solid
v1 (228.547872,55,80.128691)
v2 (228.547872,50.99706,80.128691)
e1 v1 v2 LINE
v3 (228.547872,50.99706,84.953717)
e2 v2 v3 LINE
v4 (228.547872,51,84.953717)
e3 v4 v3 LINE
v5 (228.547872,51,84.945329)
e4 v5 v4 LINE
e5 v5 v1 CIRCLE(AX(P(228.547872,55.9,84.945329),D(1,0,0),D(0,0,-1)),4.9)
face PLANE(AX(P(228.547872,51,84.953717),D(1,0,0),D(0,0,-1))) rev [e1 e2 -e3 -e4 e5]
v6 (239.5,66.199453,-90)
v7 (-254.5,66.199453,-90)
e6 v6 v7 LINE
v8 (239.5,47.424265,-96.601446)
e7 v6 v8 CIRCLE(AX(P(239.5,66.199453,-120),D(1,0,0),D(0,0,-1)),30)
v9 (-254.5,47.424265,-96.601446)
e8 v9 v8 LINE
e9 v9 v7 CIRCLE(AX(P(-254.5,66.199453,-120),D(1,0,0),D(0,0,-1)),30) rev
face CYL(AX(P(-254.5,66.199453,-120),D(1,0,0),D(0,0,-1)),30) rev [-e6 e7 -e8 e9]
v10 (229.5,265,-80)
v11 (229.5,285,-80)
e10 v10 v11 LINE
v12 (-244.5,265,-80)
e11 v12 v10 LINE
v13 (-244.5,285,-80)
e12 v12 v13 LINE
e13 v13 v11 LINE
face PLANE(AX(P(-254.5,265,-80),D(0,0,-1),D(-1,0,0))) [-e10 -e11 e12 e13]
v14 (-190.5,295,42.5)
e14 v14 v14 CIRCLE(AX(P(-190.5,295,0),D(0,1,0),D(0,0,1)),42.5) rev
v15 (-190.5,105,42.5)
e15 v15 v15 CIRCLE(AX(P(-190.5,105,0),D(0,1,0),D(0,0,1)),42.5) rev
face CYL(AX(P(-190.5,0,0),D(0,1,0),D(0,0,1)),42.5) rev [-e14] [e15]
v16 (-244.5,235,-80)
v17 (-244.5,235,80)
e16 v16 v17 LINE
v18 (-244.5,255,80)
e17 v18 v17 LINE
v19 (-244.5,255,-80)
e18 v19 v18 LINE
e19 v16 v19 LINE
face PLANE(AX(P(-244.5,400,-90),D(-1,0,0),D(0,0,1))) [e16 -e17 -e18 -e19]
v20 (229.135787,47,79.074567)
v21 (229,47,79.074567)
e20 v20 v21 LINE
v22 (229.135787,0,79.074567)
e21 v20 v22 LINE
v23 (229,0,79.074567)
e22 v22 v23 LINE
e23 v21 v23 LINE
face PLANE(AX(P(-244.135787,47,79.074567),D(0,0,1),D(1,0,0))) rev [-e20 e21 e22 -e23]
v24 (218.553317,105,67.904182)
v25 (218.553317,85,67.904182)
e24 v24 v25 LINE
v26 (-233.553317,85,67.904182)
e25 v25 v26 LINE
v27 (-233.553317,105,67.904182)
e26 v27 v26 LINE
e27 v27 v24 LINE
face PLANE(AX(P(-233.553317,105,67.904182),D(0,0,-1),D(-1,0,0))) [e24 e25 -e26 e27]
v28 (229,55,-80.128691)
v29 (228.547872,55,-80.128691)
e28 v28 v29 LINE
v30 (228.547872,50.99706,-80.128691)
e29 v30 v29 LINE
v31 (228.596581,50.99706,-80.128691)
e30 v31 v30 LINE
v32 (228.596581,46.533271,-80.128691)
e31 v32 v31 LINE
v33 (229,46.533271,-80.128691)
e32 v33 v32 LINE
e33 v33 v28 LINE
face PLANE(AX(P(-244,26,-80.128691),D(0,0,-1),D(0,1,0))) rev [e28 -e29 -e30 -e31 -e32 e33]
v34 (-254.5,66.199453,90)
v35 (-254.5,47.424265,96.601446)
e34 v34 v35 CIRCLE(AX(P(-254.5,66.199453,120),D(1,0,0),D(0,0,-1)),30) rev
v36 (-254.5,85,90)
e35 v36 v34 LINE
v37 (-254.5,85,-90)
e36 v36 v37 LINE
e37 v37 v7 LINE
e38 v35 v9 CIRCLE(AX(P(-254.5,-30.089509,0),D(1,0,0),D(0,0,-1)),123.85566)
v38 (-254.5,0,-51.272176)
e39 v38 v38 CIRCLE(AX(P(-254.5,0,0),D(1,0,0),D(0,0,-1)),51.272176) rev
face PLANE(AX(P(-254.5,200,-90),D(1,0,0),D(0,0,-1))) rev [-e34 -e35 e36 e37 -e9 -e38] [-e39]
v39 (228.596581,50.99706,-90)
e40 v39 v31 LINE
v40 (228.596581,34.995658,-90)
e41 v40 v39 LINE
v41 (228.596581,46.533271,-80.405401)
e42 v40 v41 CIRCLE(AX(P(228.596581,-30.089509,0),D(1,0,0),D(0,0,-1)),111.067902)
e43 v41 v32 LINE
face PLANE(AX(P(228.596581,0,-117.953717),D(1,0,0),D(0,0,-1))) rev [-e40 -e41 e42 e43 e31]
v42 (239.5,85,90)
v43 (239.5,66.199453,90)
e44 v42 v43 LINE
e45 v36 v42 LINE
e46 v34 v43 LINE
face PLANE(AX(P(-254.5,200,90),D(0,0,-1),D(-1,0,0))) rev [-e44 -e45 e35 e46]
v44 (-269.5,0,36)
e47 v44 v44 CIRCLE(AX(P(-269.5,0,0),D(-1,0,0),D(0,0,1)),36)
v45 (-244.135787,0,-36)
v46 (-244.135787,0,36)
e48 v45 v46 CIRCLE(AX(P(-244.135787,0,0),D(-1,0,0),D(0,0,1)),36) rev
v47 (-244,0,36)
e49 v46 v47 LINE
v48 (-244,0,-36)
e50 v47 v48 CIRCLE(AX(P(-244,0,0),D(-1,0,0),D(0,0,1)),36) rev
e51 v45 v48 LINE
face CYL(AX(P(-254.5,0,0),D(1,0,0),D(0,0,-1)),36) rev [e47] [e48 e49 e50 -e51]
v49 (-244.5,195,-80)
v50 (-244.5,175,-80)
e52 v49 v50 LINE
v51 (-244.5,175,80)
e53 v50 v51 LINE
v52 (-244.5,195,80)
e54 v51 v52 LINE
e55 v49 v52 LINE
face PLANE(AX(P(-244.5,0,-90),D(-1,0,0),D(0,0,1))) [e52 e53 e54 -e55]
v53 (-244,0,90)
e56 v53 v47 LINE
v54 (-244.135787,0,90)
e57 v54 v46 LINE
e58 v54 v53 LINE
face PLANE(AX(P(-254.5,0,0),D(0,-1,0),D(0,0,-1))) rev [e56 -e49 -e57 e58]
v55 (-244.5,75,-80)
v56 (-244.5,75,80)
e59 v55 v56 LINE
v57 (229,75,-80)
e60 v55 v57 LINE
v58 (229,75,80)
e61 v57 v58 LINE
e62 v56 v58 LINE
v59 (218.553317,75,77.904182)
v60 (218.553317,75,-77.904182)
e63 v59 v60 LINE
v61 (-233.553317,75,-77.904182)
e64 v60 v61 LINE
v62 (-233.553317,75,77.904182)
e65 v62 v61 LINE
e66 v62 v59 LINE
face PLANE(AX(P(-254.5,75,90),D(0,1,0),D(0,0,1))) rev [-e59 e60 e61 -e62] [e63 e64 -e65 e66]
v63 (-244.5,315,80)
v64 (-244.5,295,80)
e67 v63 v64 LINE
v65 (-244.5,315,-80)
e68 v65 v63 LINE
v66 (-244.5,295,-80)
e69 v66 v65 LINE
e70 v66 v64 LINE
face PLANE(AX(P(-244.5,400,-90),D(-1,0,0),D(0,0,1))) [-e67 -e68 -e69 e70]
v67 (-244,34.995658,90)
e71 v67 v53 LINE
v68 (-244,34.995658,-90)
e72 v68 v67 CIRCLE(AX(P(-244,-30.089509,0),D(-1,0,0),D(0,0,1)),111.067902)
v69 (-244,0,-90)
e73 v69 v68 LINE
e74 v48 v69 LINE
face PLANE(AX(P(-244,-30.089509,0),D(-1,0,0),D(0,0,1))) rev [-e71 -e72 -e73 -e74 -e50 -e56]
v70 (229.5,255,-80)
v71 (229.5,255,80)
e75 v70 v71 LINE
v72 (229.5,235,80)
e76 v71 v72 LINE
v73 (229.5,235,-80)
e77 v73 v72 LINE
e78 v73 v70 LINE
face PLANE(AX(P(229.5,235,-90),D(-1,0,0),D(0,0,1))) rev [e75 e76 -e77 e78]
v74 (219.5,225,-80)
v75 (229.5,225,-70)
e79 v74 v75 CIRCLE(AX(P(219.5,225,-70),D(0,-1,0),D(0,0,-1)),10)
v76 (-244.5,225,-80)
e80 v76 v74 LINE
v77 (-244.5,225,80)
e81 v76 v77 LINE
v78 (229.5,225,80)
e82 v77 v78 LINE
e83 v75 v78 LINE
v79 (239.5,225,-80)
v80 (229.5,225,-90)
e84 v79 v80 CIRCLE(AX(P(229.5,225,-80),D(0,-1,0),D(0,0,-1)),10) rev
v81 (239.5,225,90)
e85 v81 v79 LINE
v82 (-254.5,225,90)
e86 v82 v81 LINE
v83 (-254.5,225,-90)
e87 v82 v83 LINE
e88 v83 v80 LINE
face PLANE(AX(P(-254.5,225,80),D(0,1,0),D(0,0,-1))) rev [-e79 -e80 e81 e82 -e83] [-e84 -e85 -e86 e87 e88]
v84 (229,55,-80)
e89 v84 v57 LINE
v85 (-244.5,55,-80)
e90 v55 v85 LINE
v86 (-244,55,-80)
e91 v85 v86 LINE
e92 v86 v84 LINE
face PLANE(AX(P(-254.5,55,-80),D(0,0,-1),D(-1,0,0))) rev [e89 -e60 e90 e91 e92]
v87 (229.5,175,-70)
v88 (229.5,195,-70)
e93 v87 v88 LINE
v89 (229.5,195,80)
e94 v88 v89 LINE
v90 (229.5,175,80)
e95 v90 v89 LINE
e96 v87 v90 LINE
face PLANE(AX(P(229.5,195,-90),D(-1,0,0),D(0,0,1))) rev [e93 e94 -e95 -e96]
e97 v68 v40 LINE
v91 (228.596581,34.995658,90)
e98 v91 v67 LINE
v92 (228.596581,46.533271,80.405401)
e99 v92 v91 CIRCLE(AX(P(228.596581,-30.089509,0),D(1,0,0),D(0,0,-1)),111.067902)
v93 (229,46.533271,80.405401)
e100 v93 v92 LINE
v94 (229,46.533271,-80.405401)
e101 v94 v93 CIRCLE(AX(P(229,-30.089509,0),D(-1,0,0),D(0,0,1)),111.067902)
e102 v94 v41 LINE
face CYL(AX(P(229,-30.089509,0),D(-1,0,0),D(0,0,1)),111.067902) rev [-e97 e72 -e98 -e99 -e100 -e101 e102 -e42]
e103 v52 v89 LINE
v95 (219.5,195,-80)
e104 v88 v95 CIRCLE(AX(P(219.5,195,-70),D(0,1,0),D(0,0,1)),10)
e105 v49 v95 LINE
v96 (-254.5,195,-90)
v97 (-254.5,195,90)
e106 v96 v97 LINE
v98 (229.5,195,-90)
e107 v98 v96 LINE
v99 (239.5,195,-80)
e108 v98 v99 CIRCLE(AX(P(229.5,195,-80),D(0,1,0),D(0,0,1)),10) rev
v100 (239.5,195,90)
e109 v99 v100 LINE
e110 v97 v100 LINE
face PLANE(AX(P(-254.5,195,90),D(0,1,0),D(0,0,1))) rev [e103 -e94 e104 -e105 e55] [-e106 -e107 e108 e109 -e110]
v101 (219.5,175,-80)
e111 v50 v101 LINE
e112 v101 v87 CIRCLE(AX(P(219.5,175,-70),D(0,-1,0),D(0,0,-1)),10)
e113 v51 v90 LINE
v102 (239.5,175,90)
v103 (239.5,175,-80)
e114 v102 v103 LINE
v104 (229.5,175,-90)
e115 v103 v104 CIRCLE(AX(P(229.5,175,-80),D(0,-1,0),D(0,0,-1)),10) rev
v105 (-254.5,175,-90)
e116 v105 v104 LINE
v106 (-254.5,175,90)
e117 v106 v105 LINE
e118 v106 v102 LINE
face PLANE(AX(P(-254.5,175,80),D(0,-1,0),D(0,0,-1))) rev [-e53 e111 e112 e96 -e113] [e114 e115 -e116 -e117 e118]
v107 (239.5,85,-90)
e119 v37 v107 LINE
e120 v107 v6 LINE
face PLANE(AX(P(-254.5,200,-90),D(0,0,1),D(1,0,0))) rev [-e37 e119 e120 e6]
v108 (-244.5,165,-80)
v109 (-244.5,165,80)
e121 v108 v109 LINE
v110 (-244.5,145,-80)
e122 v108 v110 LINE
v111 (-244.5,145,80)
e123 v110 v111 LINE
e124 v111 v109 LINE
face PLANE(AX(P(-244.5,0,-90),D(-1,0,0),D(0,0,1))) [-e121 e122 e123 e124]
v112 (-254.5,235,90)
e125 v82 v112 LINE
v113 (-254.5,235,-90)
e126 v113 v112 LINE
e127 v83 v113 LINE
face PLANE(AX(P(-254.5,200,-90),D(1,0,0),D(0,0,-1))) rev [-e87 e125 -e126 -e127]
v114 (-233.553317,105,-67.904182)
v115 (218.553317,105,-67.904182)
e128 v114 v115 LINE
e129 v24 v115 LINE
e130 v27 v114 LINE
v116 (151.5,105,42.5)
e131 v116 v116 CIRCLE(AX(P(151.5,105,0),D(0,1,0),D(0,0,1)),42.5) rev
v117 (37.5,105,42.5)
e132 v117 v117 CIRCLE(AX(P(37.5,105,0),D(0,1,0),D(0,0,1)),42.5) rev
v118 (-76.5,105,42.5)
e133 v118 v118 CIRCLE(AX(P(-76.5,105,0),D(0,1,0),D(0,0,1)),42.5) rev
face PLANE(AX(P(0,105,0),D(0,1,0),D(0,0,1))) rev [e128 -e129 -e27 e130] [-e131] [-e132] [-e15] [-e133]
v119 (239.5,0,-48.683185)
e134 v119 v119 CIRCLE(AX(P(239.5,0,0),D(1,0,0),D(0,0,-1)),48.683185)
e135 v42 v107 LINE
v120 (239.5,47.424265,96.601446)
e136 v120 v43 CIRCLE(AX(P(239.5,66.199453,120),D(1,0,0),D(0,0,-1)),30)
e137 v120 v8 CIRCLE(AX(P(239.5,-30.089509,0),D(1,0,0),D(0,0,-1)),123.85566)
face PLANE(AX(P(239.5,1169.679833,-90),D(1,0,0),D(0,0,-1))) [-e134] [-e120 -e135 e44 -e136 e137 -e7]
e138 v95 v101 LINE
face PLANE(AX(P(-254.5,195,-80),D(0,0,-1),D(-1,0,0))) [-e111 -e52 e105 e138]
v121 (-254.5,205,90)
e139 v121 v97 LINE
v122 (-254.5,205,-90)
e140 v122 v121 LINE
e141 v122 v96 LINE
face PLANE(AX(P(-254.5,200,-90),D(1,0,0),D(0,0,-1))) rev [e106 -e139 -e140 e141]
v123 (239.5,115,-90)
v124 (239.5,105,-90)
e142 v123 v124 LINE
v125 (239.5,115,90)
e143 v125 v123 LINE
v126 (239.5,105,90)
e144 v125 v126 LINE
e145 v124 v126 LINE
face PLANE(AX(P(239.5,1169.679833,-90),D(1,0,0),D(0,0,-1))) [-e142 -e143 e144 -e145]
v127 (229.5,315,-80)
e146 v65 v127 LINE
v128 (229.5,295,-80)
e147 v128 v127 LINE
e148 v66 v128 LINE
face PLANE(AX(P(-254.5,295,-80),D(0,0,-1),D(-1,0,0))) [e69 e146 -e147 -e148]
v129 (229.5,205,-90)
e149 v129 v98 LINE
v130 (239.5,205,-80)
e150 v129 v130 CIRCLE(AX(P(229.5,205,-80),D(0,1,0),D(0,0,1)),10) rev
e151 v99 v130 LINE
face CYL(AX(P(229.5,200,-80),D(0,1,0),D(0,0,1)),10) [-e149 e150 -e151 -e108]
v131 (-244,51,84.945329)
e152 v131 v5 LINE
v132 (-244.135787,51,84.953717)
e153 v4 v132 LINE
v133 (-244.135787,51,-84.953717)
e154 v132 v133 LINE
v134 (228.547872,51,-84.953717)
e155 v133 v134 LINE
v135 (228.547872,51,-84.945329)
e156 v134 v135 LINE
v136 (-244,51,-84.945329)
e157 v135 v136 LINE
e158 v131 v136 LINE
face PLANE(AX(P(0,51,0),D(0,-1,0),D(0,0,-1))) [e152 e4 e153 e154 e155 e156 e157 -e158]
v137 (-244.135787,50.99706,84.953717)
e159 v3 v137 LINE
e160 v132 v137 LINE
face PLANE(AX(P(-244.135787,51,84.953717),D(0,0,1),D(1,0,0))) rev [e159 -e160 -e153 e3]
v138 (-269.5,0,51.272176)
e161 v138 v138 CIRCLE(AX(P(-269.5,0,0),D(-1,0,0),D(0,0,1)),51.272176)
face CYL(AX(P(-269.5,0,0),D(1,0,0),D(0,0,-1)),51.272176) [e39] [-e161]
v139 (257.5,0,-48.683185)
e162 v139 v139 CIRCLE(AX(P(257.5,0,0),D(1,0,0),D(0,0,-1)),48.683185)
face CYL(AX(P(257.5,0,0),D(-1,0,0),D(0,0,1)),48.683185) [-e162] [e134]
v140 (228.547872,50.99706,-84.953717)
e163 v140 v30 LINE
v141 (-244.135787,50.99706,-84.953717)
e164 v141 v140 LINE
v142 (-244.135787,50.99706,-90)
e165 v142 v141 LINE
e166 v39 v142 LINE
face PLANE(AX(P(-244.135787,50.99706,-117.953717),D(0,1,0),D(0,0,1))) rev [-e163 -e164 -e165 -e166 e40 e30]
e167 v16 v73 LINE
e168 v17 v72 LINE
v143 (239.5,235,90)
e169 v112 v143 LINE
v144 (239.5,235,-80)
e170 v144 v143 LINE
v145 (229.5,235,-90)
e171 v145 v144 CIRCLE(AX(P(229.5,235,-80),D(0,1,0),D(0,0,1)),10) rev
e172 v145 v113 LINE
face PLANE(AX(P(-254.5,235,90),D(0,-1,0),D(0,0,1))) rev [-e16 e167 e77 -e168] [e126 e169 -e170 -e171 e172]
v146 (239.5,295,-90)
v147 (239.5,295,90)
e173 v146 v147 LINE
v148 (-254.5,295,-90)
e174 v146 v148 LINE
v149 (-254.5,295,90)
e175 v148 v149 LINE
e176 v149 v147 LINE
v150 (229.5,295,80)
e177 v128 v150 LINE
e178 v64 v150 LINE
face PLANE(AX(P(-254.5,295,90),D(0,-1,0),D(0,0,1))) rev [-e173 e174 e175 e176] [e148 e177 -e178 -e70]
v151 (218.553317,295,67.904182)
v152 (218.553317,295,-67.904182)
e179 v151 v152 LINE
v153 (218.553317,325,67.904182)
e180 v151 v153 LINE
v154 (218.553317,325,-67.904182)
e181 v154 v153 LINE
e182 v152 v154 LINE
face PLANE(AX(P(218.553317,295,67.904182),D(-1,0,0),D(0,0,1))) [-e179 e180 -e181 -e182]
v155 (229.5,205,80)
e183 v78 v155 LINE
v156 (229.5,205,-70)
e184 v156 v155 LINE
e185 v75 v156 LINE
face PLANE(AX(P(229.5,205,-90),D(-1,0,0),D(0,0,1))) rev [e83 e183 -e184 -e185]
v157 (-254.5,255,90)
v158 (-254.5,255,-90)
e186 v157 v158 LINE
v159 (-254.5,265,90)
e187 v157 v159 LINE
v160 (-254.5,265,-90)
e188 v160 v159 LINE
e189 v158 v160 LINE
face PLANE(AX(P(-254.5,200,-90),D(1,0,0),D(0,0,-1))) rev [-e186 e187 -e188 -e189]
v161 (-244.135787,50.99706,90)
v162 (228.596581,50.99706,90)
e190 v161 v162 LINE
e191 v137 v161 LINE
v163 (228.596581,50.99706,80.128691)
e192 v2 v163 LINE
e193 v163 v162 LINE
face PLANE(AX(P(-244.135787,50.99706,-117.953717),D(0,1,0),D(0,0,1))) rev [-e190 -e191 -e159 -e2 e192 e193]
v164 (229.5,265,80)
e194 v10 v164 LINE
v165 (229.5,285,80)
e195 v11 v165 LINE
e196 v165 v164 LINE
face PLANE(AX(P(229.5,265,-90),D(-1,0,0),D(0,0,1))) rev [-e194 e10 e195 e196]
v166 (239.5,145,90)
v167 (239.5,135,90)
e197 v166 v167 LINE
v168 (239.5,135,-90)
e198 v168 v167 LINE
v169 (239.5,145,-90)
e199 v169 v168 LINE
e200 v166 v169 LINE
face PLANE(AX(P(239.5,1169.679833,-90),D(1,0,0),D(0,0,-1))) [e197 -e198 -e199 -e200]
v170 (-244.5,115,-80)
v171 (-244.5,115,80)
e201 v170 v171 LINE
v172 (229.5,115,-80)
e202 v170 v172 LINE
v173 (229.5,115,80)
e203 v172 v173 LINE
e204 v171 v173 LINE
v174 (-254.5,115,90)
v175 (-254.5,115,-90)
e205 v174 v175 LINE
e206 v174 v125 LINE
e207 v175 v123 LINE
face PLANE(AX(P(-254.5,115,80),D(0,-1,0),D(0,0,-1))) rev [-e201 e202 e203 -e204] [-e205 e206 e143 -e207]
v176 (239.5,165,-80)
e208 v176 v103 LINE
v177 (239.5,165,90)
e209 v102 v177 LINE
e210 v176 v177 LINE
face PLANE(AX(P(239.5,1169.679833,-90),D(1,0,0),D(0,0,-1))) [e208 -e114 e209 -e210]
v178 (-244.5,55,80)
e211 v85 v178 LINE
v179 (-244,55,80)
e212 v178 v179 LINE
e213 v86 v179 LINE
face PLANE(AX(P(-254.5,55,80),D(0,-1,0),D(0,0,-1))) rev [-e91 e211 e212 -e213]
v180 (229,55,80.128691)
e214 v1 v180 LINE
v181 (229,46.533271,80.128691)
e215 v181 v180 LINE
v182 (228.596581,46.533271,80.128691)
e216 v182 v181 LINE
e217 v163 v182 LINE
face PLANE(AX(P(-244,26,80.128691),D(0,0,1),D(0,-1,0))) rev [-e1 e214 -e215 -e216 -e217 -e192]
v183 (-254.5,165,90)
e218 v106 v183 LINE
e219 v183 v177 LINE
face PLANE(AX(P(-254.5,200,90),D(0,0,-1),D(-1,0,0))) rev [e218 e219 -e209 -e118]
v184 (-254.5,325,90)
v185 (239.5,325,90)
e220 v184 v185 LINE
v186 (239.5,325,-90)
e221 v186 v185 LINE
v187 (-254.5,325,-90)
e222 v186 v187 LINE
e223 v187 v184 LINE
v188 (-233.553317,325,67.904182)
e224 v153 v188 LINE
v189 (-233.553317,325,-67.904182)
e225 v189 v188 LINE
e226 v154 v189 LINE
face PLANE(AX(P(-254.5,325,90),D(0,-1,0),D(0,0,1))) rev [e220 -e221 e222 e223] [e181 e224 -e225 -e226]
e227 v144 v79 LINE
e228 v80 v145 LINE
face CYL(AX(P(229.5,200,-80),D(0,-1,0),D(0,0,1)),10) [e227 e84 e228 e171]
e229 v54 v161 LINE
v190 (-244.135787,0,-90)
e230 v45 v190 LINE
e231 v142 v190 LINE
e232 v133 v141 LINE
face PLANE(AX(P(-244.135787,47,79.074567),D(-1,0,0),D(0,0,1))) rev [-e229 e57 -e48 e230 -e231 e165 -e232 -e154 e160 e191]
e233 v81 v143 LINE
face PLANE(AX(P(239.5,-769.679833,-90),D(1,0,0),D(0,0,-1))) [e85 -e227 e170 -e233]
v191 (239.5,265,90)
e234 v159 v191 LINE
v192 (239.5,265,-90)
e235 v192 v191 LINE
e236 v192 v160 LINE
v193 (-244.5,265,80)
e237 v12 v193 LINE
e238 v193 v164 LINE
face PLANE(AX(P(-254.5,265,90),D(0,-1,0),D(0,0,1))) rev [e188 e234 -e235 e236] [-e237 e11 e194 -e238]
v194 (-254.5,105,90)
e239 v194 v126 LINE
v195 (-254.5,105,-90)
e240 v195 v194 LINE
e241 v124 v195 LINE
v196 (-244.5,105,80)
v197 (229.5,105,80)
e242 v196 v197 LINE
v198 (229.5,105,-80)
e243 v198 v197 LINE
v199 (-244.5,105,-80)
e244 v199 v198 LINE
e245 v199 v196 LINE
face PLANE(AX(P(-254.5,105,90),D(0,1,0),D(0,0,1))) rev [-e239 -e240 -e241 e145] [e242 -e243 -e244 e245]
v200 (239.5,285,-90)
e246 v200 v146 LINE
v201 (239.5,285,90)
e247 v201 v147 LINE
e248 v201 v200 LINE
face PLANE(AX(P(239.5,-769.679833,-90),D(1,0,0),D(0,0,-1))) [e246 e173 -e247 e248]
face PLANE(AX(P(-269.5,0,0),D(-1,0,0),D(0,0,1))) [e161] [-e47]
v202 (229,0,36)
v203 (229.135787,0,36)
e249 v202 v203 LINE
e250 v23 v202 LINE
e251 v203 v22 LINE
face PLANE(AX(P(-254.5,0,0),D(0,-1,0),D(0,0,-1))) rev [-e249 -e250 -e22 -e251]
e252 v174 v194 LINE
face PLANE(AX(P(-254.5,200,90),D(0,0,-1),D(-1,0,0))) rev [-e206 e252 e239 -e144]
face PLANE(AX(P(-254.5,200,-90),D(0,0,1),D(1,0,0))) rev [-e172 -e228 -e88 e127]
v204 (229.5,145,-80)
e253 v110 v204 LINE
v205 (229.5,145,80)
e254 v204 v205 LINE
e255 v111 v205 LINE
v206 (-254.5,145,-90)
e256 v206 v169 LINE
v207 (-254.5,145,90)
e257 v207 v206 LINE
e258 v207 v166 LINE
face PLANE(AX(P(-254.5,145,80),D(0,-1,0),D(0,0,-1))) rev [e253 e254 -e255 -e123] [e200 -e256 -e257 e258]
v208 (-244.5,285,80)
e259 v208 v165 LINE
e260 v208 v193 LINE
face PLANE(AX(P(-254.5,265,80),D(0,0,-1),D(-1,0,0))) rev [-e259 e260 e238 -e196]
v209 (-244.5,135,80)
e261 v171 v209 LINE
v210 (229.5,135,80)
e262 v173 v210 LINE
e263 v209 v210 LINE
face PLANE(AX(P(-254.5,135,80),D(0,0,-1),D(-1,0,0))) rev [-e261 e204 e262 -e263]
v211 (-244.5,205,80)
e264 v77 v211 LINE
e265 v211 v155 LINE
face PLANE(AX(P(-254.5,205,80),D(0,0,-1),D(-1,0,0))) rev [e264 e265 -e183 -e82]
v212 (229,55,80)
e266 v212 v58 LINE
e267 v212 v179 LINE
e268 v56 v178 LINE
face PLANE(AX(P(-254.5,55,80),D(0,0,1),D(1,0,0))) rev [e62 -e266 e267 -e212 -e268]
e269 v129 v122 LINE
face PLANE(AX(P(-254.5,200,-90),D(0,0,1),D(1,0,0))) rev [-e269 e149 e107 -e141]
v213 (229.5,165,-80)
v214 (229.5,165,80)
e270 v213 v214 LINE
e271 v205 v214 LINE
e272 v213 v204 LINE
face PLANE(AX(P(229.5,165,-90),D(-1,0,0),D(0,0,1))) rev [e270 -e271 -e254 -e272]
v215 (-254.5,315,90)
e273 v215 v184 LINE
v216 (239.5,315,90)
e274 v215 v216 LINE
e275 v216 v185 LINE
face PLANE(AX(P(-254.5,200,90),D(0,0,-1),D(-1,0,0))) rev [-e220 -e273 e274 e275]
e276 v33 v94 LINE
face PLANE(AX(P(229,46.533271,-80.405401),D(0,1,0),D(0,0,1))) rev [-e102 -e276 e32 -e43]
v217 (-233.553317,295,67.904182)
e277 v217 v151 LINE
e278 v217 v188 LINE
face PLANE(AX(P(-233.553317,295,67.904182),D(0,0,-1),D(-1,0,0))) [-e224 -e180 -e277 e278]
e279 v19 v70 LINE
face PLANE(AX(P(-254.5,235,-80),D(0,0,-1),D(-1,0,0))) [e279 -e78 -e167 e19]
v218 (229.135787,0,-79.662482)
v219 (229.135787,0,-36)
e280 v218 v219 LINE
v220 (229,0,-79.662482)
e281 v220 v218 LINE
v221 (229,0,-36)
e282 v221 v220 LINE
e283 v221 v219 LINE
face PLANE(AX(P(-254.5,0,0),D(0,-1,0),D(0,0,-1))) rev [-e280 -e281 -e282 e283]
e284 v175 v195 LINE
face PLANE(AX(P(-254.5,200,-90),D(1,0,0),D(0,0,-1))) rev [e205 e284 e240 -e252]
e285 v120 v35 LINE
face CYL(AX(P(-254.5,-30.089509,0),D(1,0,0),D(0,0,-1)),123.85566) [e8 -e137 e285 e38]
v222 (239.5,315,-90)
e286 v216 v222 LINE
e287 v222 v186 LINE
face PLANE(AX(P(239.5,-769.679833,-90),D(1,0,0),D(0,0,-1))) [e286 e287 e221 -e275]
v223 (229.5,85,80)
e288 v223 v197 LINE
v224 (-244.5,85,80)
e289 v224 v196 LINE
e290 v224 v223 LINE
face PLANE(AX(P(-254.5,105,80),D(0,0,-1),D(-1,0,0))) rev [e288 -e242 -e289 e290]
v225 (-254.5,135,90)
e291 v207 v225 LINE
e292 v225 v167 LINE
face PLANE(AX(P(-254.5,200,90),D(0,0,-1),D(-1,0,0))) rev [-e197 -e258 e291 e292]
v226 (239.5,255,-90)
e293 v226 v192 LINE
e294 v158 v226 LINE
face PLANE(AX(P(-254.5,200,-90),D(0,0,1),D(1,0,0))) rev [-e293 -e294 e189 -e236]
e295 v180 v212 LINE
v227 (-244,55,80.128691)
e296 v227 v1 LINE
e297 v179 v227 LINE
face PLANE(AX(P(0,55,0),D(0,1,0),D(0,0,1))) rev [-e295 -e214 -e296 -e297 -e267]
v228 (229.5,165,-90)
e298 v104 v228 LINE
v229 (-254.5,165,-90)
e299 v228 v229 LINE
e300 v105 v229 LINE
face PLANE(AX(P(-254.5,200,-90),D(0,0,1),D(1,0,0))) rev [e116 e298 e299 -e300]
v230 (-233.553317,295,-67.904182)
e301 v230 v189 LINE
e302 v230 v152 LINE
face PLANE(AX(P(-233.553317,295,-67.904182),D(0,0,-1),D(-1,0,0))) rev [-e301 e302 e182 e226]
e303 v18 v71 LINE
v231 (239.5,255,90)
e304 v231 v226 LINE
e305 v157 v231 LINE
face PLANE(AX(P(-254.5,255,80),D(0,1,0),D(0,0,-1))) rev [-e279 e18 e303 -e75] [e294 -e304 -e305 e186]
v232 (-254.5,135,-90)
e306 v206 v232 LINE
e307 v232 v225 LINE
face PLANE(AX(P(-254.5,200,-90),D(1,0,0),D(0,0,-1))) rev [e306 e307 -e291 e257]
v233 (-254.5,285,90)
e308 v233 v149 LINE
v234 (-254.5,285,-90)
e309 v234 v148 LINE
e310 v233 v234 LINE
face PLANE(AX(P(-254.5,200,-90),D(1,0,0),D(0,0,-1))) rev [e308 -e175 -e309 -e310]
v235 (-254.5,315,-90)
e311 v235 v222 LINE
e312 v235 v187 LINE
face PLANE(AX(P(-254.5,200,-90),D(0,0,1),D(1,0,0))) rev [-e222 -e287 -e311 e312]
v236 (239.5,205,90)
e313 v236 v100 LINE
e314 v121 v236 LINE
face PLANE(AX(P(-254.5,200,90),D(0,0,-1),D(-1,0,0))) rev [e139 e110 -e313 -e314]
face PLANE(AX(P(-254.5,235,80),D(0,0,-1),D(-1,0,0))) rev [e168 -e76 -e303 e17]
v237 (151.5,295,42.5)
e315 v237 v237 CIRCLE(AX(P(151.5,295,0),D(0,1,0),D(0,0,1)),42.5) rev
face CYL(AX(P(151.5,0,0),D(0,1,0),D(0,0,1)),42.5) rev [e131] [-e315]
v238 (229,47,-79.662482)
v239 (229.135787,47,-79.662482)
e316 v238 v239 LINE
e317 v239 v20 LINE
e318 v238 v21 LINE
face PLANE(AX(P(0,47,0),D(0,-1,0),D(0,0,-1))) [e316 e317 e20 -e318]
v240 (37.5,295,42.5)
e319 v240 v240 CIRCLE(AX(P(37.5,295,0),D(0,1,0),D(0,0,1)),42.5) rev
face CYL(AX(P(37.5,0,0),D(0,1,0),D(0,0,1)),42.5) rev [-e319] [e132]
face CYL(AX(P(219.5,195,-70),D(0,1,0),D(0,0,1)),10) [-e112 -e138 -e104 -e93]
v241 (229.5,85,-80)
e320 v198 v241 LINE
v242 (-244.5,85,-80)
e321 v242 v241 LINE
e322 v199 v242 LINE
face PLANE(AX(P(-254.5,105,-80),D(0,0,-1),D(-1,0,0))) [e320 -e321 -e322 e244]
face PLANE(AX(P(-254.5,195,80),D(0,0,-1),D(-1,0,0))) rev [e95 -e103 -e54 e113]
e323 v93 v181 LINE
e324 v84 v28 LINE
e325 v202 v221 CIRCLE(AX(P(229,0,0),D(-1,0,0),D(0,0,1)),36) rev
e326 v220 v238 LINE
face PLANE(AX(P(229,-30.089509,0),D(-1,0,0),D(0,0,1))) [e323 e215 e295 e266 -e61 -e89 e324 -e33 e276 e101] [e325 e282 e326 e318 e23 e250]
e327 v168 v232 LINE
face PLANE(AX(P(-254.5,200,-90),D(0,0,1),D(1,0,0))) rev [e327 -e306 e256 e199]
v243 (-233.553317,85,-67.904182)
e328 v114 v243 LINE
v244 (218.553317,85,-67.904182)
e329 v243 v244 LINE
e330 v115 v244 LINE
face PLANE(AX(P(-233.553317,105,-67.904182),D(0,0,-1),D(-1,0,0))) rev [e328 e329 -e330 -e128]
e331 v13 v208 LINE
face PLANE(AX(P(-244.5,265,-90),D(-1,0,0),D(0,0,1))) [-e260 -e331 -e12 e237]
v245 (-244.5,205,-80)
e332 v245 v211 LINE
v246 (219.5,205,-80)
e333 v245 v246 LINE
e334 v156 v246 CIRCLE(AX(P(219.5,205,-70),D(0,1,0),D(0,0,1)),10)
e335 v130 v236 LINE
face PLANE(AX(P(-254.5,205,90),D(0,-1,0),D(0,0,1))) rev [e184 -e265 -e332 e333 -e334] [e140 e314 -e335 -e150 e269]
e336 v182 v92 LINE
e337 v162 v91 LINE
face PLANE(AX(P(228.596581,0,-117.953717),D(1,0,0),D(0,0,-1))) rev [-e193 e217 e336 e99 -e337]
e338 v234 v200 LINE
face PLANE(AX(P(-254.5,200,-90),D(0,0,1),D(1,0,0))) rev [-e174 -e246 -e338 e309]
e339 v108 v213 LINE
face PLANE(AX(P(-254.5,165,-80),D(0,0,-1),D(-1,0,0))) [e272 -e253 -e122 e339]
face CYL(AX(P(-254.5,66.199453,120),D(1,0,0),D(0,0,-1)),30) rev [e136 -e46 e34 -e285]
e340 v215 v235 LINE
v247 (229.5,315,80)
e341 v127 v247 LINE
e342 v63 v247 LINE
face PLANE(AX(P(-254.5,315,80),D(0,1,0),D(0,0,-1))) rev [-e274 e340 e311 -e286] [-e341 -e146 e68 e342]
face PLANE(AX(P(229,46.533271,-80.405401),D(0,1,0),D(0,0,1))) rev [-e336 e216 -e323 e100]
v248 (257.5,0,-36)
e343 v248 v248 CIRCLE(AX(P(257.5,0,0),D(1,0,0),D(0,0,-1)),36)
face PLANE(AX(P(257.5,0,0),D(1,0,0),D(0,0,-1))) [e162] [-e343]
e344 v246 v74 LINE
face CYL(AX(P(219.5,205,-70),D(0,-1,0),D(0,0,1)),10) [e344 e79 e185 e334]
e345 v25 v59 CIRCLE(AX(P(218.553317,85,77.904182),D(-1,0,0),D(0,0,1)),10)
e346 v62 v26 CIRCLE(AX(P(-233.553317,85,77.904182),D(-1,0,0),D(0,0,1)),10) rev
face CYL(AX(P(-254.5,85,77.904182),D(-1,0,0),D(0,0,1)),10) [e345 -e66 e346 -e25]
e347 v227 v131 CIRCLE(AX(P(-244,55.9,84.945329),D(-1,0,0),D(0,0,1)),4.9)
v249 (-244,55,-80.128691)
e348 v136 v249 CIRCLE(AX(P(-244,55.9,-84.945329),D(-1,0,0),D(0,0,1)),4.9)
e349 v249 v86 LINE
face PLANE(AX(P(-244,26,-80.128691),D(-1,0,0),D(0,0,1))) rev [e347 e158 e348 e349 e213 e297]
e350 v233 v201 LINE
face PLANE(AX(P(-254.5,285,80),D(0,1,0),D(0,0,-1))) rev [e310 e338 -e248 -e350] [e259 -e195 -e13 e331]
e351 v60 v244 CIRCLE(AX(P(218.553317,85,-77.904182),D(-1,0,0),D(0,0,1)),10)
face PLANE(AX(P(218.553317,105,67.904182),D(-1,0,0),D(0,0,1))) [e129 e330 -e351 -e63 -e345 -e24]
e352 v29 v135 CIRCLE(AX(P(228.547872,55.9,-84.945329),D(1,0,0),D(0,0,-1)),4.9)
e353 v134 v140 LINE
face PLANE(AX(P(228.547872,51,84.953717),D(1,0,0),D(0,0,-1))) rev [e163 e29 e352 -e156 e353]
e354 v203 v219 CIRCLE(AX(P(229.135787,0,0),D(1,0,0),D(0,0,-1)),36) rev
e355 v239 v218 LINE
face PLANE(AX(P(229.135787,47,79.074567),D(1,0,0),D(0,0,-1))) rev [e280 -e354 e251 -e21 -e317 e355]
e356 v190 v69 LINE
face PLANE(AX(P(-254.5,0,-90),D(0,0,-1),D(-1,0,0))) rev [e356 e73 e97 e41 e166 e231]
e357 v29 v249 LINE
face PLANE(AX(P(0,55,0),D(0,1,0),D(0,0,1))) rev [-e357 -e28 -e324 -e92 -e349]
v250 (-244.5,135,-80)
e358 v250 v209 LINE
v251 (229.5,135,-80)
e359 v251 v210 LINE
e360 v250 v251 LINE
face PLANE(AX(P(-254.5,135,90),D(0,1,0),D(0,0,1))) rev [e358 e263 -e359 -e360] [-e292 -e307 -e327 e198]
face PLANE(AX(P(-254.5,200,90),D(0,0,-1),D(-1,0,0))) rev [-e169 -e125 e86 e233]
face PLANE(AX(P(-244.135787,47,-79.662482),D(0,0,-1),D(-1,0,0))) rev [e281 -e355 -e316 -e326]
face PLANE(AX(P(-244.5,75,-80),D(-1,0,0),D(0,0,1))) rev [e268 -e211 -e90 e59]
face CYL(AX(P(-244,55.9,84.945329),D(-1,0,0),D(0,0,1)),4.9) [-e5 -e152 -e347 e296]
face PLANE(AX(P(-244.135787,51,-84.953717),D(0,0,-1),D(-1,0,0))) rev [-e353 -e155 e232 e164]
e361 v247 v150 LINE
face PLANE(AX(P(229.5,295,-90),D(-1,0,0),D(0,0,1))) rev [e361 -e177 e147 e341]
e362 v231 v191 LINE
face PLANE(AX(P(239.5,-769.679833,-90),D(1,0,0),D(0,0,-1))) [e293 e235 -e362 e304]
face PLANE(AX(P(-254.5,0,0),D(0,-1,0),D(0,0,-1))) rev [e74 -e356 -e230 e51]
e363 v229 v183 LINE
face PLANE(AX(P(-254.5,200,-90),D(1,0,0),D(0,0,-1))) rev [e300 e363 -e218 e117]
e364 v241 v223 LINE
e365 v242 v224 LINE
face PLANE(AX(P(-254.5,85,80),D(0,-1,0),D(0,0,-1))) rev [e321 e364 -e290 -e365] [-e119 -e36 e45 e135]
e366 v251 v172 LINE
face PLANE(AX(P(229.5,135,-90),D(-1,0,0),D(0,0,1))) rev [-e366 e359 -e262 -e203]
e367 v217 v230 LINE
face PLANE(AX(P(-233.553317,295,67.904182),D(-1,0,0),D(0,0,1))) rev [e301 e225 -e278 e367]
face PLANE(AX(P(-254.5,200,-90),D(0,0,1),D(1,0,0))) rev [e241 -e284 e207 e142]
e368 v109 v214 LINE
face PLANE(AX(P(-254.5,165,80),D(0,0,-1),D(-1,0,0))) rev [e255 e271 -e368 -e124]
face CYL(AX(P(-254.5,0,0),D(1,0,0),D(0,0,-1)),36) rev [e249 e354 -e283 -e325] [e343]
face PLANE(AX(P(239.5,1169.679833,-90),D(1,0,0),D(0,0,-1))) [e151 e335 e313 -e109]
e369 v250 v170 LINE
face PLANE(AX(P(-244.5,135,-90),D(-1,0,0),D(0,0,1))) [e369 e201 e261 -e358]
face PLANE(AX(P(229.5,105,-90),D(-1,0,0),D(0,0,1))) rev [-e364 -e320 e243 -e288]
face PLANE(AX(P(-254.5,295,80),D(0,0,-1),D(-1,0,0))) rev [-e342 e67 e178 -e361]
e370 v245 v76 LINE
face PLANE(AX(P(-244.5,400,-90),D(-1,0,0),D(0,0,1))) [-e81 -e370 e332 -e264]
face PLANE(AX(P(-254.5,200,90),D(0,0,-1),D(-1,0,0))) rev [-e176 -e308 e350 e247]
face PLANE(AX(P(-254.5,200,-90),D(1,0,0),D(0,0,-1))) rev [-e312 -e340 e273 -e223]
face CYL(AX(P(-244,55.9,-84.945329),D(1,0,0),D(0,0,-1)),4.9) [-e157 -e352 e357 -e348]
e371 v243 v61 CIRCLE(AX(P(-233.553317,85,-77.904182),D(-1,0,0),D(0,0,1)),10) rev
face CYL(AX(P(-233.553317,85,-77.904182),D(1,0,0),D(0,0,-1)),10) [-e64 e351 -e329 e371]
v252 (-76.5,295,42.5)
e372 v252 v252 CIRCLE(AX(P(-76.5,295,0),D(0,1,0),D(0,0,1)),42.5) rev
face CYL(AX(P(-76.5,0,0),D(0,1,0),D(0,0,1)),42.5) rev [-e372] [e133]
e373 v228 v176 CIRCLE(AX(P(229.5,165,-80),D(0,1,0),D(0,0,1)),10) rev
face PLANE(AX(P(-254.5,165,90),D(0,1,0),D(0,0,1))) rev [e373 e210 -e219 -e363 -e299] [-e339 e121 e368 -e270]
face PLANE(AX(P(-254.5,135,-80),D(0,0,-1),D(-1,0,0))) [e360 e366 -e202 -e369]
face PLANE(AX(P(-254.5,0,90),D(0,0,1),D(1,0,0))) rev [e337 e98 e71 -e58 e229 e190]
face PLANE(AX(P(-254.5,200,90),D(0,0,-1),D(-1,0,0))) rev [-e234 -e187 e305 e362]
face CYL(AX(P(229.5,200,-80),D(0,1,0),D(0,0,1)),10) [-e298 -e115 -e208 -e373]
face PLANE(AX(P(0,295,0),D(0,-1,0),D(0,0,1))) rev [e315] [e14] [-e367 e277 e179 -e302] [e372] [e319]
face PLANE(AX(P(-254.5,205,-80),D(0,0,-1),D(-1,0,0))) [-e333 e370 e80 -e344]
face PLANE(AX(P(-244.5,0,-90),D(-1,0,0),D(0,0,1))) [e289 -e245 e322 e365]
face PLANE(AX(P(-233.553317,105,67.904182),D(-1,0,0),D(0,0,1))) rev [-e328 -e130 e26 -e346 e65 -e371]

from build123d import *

# Parameters (mm, degrees)
SKETCH1_W                 = 509
SKETCH1_H                 = 180
BOSS_EXTRUDE2_DEPTH       = 200
CUT_EXTRUDE2_DEPTH        = 336.961679362
CUT_EXTRUDE2_DEPTH_BACK   = 200
CUT_EXTRUDE4_DEPTH        = 336.961679362
SKETCH6_W                 = 10
SKETCH6_H                 = 20
CUT_EXTRUDE10_DEPTH       = 541.496068441
SKETCH12_W                = 10
SKETCH12_H                = 20
CUT_EXTRUDE11_DEPTH       = 371.365022647
SKETCH4_W                 = 10
SKETCH4_H                 = 20
CUT_EXTRUDE12_DEPTH       = 371.365022647
FILLET1_R                 = 10
SKETCH17_W                = 452.106634796
SKETCH17_H                = 135.808364938
CUT_EXTRUDE14_DEPTH       = 105
SKETCH16_R                = 36
CUT_EXTRUDE15_DEPTH       = 541.496068441
SKETCH19_W                = 473.271574788
SKETCH19_H                = 158.737049928
CUT_EXTRUDE16_DEPTH       = 47
SKETCH22_W                = 494
SKETCH22_H                = 179.65703746
CUT_EXTRUDE20_DEPTH       = 75
SKETCH23_W                = 472.683659788
SKETCH23_H                = 169.907434924
CUT_EXTRUDE21_DEPTH       = 51
CUT_EXTRUDE22_DEPTH       = 189
CUT_EXTRUDE22_DEPTH_BACK  = 33
SKETCH27_W                = 472.732368702
SKETCH27_H                = 50.997060285
BOSS_EXTRUDE5_DEPTH       = 494
SKETCH30_R                = 36
CUT_EXTRUDE24_DEPTH       = 605.153312137
CUT_EXTRUDE25_DEPTH       = 236.5
BOSS_EXTRUDE10_DEPTH      = 10
BOSS_EXTRUDE10_DEPTH_BACK = 484
SKETCH35_W                = 10
SKETCH35_H                = 20
BOSS_EXTRUDE11_DEPTH      = 10
BOSS_EXTRUDE11_DEPTH_BACK = 484
SKETCH38_W                = 10
SKETCH38_H                = 20
SKETCH40_W                = 160
SKETCH40_H                = 20
CUT_EXTRUDE26_DEPTH       = 484
SKETCH41_W                = 473
SKETCH41_H                = 160.25738228
CUT_EXTRUDE27_DEPTH       = 29
SKETCH39_W                = 10
SKETCH39_H                = 20
BOSS_EXTRUDE12_DEPTH      = 160
SKETCH43_W                = 10.5
SKETCH43_H                = 20
BOSS_EXTRUDE13_DEPTH      = 160
FILLET5_R                 = 30
FILLET6_R                 = 30
FILLET7_R                 = 10
FILLET8_R                 = 10
FILLET9_R                 = 4.9
SKETCH44_R                = 48.683185172
SKETCH44_R_2              = 36
BOSS_EXTRUDE14_DEPTH      = 18
SKETCH45_R                = 51.27217623
SKETCH45_R_2              = 36
BOSS_EXTRUDE15_DEPTH      = 15


with BuildPart() as part:
    # Sketch1 → Boss-Extrude2 (new body)
    with BuildSketch(Plane(origin=(0, 0, 0), x_dir=(1, 0, 0), z_dir=(0, 1, 0))):
        Rectangle(SKETCH1_W, SKETCH1_H)
    extrude(amount=BOSS_EXTRUDE2_DEPTH)

    # Sketch3 → Cut-Extrude2 (cut, two sides: drawn at the far end of the back side and taken through both)
    with BuildSketch(Plane(origin=(0, 200, 0), x_dir=(1, 0, 0), z_dir=(0, 1, 0)).offset(-CUT_EXTRUDE2_DEPTH_BACK)):
        Polygon((254.5, -1179.779607142), (254.5, -90), (254.5, 90), (239.5, 90), (239.5, -90), (239.5, -1179.779607142), (239.5, -3359.338821426), (254.5, -3359.338821426), align=None)
    extrude(amount=CUT_EXTRUDE2_DEPTH + CUT_EXTRUDE2_DEPTH_BACK, mode=Mode.SUBTRACT)

    # Sketch2 → Cut-Extrude4 (cut, through all)
    with BuildSketch(Plane(origin=(0, 200, 0), x_dir=(1, 0, 0), z_dir=(0, 1, 0))):
        with BuildLine():
            Line((-233, 0), (-190.5, 0))
            Line((-190.5, 0), (-148, 0))
            ThreePointArc((-148, 0), (-190.5, 42.5), (-233, 0))
        make_face()
        with BuildLine():
            Line((-148, 0), (-190.5, 0))
            Line((-190.5, 0), (-233, 0))
            ThreePointArc((-233, 0), (-190.5, -42.5), (-148, 0))
        make_face()
        with BuildLine():
            ThreePointArc((-34, 0), (-76.5, 42.5), (-119, 0))
            Line((-119, 0), (-76.5, 0))
            Line((-76.5, 0), (-34, 0))
        make_face()
        with BuildLine():
            Line((-76.5, 0), (-119, 0))
            ThreePointArc((-119, 0), (-76.5, -42.5), (-34, 0))
            Line((-34, 0), (-76.5, 0))
        make_face()
        with BuildLine():
            ThreePointArc((80, 0), (37.5, 42.5), (-5, 0))
            Line((-5, 0), (37.5, 0))
            Line((37.5, 0), (80, 0))
        make_face()
        with BuildLine():
            Line((37.5, 0), (-5, 0))
            ThreePointArc((-5, 0), (37.5, -42.5), (80, 0))
            Line((80, 0), (37.5, 0))
        make_face()
        with BuildLine():
            ThreePointArc((194, 0), (151.5, 42.5), (109, 0))
            Line((109, 0), (151.5, 0))
            Line((151.5, 0), (194, 0))
        make_face()
        with BuildLine():
            Line((151.5, 0), (109, 0))
            ThreePointArc((109, 0), (151.5, -42.5), (194, 0))
            Line((194, 0), (151.5, 0))
        make_face()
    extrude(amount=-CUT_EXTRUDE4_DEPTH, mode=Mode.SUBTRACT)

    # Sketch6 → Cut-Extrude10 (cut, through all)
    with BuildSketch(Plane(origin=(239.5, 0, 0), x_dir=(0, 0, -1), z_dir=(1, 0, 0))):
        with Locations((-85, 185)):
            Rectangle(SKETCH6_W, SKETCH6_H)
        with Locations((-85, 155)):
            Rectangle(SKETCH6_W, SKETCH6_H)
        with Locations((-85, 125)):
            Rectangle(SKETCH6_W, SKETCH6_H)
        with Locations((-85, 95)):
            Rectangle(SKETCH6_W, SKETCH6_H)
        with Locations((-85, 65)):
            Rectangle(SKETCH6_W, SKETCH6_H)
    cut_extrude10 = extrude(amount=-CUT_EXTRUDE10_DEPTH, mode=Mode.SUBTRACT)

    # Sketch12 → Cut-Extrude11 (cut, through all)
    with BuildSketch(Plane.XY.offset(90)):
        with Locations((234.5, 185)):
            Rectangle(SKETCH12_W, SKETCH12_H)
        with Locations((234.5, 155)):
            Rectangle(SKETCH12_W, SKETCH12_H)
        with Locations((234.5, 125)):
            Rectangle(SKETCH12_W, SKETCH12_H)
        with Locations((234.5, 95)):
            Rectangle(SKETCH12_W, SKETCH12_H)
        with Locations((234.5, 65)):
            Rectangle(SKETCH12_W, SKETCH12_H)
    extrude(amount=-CUT_EXTRUDE11_DEPTH, mode=Mode.SUBTRACT)

    # Sketch4 → Cut-Extrude12 (cut, through all)
    with BuildSketch(Plane.XY.offset(90)):
        with Locations((-249.5, 185)):
            Rectangle(SKETCH4_W, SKETCH4_H)
        with Locations((-249.5, 155)):
            Rectangle(SKETCH4_W, SKETCH4_H)
        with Locations((-249.5, 95)):
            Rectangle(SKETCH4_W, SKETCH4_H)
        with Locations((-249.5, 65)):
            Rectangle(SKETCH4_W, SKETCH4_H)
        with Locations((-249.5, 125)):
            Rectangle(SKETCH4_W, SKETCH4_H)
    extrude(amount=-CUT_EXTRUDE12_DEPTH, mode=Mode.SUBTRACT)

    # Mirror3: Cut-Extrude10 across plane
    add(cut_extrude10.mirror(Plane.XY), mode=Mode.SUBTRACT)

    # Fillet1
    fillet1_edges = [part.edges().sort_by_distance(p)[0] for p in [
        (239.5, 170, -90),
        (239.5, 197.5, -90),
        (229.5, 185, -80),
    ]]
    fillet(fillet1_edges, radius=FILLET1_R)

    # Sketch17 → Cut-Extrude14 (cut)
    with BuildSketch(Plane.XZ):
        with Locations((-7.5, 0)):
            Rectangle(SKETCH17_W, SKETCH17_H)
    extrude(amount=-CUT_EXTRUDE14_DEPTH, mode=Mode.SUBTRACT)

    # Sketch16 → Cut-Extrude15 (cut, through all)
    with BuildSketch(Plane(origin=(239.5, 0, 0), x_dir=(0, 0, -1), z_dir=(1, 0, 0))):
        Circle(SKETCH16_R)
    extrude(amount=-CUT_EXTRUDE15_DEPTH, mode=Mode.SUBTRACT)

    # Sketch19 → Cut-Extrude16 (cut)
    with BuildSketch(Plane.XZ):
        with Locations((-7.5, -0.2939575)):
            Rectangle(SKETCH19_W, SKETCH19_H)
    extrude(amount=-CUT_EXTRUDE16_DEPTH, mode=Mode.SUBTRACT)

    # Mirror10: part across plane


with BuildPart() as part_1:
    add(part.part)
    add(part.part.mirror(Plane.ZX.offset(200)))

    # Sketch22 → Cut-Extrude20 (cut)
    with BuildSketch(Plane(origin=(0, 400, 0), x_dir=(1, 0, 0), z_dir=(0, 1, 0))):
        with Locations((-7.5, -0.17148127)):
            Rectangle(SKETCH22_W, SKETCH22_H)
    extrude(amount=-CUT_EXTRUDE20_DEPTH, mode=Mode.SUBTRACT)


with BuildPart() as body_2:
    # of the pieces the cut leaves, the one that is kept (cut_extrude20_keep)
    add(part_1.part.solids().sort_by_distance((239.5, 165, -80))[0])

    # Sketch23 → Cut-Extrude21 (cut)
    with BuildSketch(Plane.XZ):
        with Locations((-7.7939575, 0)):
            Rectangle(SKETCH23_W, SKETCH23_H)
    extrude(amount=-CUT_EXTRUDE21_DEPTH, mode=Mode.SUBTRACT)

    # Sketch27 → Cut-Extrude22 (cut, two sides: drawn at the far end of the back side and taken through both)
    with BuildSketch(Plane.XY.offset(-84.953717462).offset(-CUT_EXTRUDE22_DEPTH_BACK)):
        with Locations((-7.769603043, 25.498530143)):
            Rectangle(SKETCH27_W, SKETCH27_H)
    extrude(amount=CUT_EXTRUDE22_DEPTH + CUT_EXTRUDE22_DEPTH_BACK, mode=Mode.SUBTRACT)

    # Sketch28 → Boss-Extrude5 (add)
    with BuildSketch(Plane(origin=(239.5, 0, 0), x_dir=(0, 0, -1), z_dir=(1, 0, 0))):
        with BuildLine():
            ThreePointArc((-90, 55), (0, -153.945169347), (90, 55))
            Line((90, 55), (90, 0))
            Line((90, 0), (36, 0))
            ThreePointArc((36, 0), (0, 36), (-36, 0))
            Line((-36, 0), (-90, 0))
            Line((-90, 0), (-90, 55))
        make_face()
    extrude(amount=-BOSS_EXTRUDE5_DEPTH)

    # Sketch30 → Cut-Extrude24 (cut, through all)
    with BuildSketch(Plane(origin=(239.5, 0, 0), x_dir=(0, 0, -1), z_dir=(1, 0, 0))):
        Circle(SKETCH30_R)
    extrude(amount=-CUT_EXTRUDE24_DEPTH, mode=Mode.SUBTRACT)

    # Sketch31 → Cut-Extrude25 (cut, symmetric)
    with BuildSketch(Plane.ZY.offset(7.5)):
        with BuildLine():
            Line((-80.405401165, 46.53327076), (80.405401165, 46.53327076))
            ThreePointArc((80.405401165, 46.53327076), (0, -141.157411505), (-80.405401165, 46.53327076))
        make_face()
    extrude(amount=CUT_EXTRUDE25_DEPTH, both=True, mode=Mode.SUBTRACT)

    # Sketch35 → Boss-Extrude10 (add, two sides: drawn at the far end of the back side and taken through both)
    with BuildSketch(Plane.ZY.offset(244.5).offset(-BOSS_EXTRUDE10_DEPTH_BACK)):
        with Locations((85, 65)):
            Rectangle(SKETCH35_W, SKETCH35_H)
    extrude(amount=BOSS_EXTRUDE10_DEPTH + BOSS_EXTRUDE10_DEPTH_BACK)

    # Sketch38 → Boss-Extrude11 (add, two sides: drawn at the far end of the back side and taken through both)
    with BuildSketch(Plane.ZY.offset(244.5).offset(-BOSS_EXTRUDE11_DEPTH_BACK)):
        with Locations((-85, 65)):
            Rectangle(SKETCH38_W, SKETCH38_H)
    extrude(amount=BOSS_EXTRUDE11_DEPTH + BOSS_EXTRUDE11_DEPTH_BACK)

    # Sketch40 → Cut-Extrude26 (cut)
    with BuildSketch(Plane.ZY.offset(244.5)):
        with Locations((0, 65)):
            Rectangle(SKETCH40_W, SKETCH40_H)
    extrude(amount=-CUT_EXTRUDE26_DEPTH, mode=Mode.SUBTRACT)

    # Sketch41 → Cut-Extrude27 (cut)
    with BuildSketch(Plane(origin=(0, 55, 0), x_dir=(1, 0, 0), z_dir=(0, 1, 0))):
        with Locations((-7.5, 0)):
            Rectangle(SKETCH41_W, SKETCH41_H)
    extrude(amount=-CUT_EXTRUDE27_DEPTH, mode=Mode.SUBTRACT)

    # Sketch39 → Boss-Extrude12 (add)
    with BuildSketch(Plane(origin=(0, 0, 80), x_dir=(-1, 0, 0), z_dir=(0, 0, -1))):
        with Locations((249.5, 65)):
            Rectangle(SKETCH39_W, SKETCH39_H)
    extrude(amount=BOSS_EXTRUDE12_DEPTH)

    # Sketch43 → Boss-Extrude13 (add)
    with BuildSketch(Plane(origin=(0, 0, 80), x_dir=(-1, 0, 0), z_dir=(0, 0, -1))):
        with Locations((-234.25, 65)):
            Rectangle(SKETCH43_W, SKETCH43_H)
    extrude(amount=BOSS_EXTRUDE13_DEPTH)

    # Fillet5
    fillet5_edges = [body_2.edges().sort_by_distance(p)[0] for p in [
        (-7.5, 55, 90),
    ]]
    fillet(fillet5_edges, radius=FILLET5_R)

    # Fillet6
    fillet6_edges = [body_2.edges().sort_by_distance(p)[0] for p in [
        (-7.5, 55, -90),
    ]]
    fillet(fillet6_edges, radius=FILLET6_R)

    # Fillet7
    fillet7_edges = [body_2.edges().sort_by_distance(p)[0] for p in [
        (-7.5, 75, -67.904182469),
    ]]
    fillet(fillet7_edges, radius=FILLET7_R)

    # Fillet8
    fillet8_edges = [body_2.edges().sort_by_distance(p)[0] for p in [
        (-7.5, 75, 67.904182469),
    ]]
    fillet(fillet8_edges, radius=FILLET8_R)

    # Fillet9
    # the kernel refuses this fillet: 4.9 mm, written as the material it takes off along each edge
    with BuildSketch(Plane(origin=(228.547872394, 51, 80.12869114), x_dir=(0, 0, 1), z_dir=(-1, 0, 0)), Plane(origin=(-244, 51, -80.12869114), x_dir=(0, 0, -1), z_dir=(1, 0, 0))) as fillet9_piece_1:
        with BuildLine():
            CenterArc((4.816637832, 4.9), FILLET9_R, 190.583802597, 79.416197403)
            Line((0, 4), (0, 0))
            Line((0, 0), (4.816637832, 0))
        make_face()
    extrude(amount=472.547872394, mode=Mode.SUBTRACT)

    # Sketch44 → Boss-Extrude14 (add)
    with BuildSketch(Plane(origin=(239.5, 0, 0), x_dir=(0, 0, -1), z_dir=(1, 0, 0))):
        Circle(SKETCH44_R)
        Circle(SKETCH44_R_2, mode=Mode.SUBTRACT)
    extrude(amount=BOSS_EXTRUDE14_DEPTH)

    # Sketch45 → Boss-Extrude15 (add)
    with BuildSketch(Plane.ZY.offset(254.5)):
        with Locations(Location((0, 0, 0), (0, 0, 180))):
            Circle(SKETCH45_R)
        with Locations(Location((0, 0, 0), (0, 0, 180))):
            Circle(SKETCH45_R_2, mode=Mode.SUBTRACT)
    extrude(amount=BOSS_EXTRUDE15_DEPTH)


solid = body_2.part
